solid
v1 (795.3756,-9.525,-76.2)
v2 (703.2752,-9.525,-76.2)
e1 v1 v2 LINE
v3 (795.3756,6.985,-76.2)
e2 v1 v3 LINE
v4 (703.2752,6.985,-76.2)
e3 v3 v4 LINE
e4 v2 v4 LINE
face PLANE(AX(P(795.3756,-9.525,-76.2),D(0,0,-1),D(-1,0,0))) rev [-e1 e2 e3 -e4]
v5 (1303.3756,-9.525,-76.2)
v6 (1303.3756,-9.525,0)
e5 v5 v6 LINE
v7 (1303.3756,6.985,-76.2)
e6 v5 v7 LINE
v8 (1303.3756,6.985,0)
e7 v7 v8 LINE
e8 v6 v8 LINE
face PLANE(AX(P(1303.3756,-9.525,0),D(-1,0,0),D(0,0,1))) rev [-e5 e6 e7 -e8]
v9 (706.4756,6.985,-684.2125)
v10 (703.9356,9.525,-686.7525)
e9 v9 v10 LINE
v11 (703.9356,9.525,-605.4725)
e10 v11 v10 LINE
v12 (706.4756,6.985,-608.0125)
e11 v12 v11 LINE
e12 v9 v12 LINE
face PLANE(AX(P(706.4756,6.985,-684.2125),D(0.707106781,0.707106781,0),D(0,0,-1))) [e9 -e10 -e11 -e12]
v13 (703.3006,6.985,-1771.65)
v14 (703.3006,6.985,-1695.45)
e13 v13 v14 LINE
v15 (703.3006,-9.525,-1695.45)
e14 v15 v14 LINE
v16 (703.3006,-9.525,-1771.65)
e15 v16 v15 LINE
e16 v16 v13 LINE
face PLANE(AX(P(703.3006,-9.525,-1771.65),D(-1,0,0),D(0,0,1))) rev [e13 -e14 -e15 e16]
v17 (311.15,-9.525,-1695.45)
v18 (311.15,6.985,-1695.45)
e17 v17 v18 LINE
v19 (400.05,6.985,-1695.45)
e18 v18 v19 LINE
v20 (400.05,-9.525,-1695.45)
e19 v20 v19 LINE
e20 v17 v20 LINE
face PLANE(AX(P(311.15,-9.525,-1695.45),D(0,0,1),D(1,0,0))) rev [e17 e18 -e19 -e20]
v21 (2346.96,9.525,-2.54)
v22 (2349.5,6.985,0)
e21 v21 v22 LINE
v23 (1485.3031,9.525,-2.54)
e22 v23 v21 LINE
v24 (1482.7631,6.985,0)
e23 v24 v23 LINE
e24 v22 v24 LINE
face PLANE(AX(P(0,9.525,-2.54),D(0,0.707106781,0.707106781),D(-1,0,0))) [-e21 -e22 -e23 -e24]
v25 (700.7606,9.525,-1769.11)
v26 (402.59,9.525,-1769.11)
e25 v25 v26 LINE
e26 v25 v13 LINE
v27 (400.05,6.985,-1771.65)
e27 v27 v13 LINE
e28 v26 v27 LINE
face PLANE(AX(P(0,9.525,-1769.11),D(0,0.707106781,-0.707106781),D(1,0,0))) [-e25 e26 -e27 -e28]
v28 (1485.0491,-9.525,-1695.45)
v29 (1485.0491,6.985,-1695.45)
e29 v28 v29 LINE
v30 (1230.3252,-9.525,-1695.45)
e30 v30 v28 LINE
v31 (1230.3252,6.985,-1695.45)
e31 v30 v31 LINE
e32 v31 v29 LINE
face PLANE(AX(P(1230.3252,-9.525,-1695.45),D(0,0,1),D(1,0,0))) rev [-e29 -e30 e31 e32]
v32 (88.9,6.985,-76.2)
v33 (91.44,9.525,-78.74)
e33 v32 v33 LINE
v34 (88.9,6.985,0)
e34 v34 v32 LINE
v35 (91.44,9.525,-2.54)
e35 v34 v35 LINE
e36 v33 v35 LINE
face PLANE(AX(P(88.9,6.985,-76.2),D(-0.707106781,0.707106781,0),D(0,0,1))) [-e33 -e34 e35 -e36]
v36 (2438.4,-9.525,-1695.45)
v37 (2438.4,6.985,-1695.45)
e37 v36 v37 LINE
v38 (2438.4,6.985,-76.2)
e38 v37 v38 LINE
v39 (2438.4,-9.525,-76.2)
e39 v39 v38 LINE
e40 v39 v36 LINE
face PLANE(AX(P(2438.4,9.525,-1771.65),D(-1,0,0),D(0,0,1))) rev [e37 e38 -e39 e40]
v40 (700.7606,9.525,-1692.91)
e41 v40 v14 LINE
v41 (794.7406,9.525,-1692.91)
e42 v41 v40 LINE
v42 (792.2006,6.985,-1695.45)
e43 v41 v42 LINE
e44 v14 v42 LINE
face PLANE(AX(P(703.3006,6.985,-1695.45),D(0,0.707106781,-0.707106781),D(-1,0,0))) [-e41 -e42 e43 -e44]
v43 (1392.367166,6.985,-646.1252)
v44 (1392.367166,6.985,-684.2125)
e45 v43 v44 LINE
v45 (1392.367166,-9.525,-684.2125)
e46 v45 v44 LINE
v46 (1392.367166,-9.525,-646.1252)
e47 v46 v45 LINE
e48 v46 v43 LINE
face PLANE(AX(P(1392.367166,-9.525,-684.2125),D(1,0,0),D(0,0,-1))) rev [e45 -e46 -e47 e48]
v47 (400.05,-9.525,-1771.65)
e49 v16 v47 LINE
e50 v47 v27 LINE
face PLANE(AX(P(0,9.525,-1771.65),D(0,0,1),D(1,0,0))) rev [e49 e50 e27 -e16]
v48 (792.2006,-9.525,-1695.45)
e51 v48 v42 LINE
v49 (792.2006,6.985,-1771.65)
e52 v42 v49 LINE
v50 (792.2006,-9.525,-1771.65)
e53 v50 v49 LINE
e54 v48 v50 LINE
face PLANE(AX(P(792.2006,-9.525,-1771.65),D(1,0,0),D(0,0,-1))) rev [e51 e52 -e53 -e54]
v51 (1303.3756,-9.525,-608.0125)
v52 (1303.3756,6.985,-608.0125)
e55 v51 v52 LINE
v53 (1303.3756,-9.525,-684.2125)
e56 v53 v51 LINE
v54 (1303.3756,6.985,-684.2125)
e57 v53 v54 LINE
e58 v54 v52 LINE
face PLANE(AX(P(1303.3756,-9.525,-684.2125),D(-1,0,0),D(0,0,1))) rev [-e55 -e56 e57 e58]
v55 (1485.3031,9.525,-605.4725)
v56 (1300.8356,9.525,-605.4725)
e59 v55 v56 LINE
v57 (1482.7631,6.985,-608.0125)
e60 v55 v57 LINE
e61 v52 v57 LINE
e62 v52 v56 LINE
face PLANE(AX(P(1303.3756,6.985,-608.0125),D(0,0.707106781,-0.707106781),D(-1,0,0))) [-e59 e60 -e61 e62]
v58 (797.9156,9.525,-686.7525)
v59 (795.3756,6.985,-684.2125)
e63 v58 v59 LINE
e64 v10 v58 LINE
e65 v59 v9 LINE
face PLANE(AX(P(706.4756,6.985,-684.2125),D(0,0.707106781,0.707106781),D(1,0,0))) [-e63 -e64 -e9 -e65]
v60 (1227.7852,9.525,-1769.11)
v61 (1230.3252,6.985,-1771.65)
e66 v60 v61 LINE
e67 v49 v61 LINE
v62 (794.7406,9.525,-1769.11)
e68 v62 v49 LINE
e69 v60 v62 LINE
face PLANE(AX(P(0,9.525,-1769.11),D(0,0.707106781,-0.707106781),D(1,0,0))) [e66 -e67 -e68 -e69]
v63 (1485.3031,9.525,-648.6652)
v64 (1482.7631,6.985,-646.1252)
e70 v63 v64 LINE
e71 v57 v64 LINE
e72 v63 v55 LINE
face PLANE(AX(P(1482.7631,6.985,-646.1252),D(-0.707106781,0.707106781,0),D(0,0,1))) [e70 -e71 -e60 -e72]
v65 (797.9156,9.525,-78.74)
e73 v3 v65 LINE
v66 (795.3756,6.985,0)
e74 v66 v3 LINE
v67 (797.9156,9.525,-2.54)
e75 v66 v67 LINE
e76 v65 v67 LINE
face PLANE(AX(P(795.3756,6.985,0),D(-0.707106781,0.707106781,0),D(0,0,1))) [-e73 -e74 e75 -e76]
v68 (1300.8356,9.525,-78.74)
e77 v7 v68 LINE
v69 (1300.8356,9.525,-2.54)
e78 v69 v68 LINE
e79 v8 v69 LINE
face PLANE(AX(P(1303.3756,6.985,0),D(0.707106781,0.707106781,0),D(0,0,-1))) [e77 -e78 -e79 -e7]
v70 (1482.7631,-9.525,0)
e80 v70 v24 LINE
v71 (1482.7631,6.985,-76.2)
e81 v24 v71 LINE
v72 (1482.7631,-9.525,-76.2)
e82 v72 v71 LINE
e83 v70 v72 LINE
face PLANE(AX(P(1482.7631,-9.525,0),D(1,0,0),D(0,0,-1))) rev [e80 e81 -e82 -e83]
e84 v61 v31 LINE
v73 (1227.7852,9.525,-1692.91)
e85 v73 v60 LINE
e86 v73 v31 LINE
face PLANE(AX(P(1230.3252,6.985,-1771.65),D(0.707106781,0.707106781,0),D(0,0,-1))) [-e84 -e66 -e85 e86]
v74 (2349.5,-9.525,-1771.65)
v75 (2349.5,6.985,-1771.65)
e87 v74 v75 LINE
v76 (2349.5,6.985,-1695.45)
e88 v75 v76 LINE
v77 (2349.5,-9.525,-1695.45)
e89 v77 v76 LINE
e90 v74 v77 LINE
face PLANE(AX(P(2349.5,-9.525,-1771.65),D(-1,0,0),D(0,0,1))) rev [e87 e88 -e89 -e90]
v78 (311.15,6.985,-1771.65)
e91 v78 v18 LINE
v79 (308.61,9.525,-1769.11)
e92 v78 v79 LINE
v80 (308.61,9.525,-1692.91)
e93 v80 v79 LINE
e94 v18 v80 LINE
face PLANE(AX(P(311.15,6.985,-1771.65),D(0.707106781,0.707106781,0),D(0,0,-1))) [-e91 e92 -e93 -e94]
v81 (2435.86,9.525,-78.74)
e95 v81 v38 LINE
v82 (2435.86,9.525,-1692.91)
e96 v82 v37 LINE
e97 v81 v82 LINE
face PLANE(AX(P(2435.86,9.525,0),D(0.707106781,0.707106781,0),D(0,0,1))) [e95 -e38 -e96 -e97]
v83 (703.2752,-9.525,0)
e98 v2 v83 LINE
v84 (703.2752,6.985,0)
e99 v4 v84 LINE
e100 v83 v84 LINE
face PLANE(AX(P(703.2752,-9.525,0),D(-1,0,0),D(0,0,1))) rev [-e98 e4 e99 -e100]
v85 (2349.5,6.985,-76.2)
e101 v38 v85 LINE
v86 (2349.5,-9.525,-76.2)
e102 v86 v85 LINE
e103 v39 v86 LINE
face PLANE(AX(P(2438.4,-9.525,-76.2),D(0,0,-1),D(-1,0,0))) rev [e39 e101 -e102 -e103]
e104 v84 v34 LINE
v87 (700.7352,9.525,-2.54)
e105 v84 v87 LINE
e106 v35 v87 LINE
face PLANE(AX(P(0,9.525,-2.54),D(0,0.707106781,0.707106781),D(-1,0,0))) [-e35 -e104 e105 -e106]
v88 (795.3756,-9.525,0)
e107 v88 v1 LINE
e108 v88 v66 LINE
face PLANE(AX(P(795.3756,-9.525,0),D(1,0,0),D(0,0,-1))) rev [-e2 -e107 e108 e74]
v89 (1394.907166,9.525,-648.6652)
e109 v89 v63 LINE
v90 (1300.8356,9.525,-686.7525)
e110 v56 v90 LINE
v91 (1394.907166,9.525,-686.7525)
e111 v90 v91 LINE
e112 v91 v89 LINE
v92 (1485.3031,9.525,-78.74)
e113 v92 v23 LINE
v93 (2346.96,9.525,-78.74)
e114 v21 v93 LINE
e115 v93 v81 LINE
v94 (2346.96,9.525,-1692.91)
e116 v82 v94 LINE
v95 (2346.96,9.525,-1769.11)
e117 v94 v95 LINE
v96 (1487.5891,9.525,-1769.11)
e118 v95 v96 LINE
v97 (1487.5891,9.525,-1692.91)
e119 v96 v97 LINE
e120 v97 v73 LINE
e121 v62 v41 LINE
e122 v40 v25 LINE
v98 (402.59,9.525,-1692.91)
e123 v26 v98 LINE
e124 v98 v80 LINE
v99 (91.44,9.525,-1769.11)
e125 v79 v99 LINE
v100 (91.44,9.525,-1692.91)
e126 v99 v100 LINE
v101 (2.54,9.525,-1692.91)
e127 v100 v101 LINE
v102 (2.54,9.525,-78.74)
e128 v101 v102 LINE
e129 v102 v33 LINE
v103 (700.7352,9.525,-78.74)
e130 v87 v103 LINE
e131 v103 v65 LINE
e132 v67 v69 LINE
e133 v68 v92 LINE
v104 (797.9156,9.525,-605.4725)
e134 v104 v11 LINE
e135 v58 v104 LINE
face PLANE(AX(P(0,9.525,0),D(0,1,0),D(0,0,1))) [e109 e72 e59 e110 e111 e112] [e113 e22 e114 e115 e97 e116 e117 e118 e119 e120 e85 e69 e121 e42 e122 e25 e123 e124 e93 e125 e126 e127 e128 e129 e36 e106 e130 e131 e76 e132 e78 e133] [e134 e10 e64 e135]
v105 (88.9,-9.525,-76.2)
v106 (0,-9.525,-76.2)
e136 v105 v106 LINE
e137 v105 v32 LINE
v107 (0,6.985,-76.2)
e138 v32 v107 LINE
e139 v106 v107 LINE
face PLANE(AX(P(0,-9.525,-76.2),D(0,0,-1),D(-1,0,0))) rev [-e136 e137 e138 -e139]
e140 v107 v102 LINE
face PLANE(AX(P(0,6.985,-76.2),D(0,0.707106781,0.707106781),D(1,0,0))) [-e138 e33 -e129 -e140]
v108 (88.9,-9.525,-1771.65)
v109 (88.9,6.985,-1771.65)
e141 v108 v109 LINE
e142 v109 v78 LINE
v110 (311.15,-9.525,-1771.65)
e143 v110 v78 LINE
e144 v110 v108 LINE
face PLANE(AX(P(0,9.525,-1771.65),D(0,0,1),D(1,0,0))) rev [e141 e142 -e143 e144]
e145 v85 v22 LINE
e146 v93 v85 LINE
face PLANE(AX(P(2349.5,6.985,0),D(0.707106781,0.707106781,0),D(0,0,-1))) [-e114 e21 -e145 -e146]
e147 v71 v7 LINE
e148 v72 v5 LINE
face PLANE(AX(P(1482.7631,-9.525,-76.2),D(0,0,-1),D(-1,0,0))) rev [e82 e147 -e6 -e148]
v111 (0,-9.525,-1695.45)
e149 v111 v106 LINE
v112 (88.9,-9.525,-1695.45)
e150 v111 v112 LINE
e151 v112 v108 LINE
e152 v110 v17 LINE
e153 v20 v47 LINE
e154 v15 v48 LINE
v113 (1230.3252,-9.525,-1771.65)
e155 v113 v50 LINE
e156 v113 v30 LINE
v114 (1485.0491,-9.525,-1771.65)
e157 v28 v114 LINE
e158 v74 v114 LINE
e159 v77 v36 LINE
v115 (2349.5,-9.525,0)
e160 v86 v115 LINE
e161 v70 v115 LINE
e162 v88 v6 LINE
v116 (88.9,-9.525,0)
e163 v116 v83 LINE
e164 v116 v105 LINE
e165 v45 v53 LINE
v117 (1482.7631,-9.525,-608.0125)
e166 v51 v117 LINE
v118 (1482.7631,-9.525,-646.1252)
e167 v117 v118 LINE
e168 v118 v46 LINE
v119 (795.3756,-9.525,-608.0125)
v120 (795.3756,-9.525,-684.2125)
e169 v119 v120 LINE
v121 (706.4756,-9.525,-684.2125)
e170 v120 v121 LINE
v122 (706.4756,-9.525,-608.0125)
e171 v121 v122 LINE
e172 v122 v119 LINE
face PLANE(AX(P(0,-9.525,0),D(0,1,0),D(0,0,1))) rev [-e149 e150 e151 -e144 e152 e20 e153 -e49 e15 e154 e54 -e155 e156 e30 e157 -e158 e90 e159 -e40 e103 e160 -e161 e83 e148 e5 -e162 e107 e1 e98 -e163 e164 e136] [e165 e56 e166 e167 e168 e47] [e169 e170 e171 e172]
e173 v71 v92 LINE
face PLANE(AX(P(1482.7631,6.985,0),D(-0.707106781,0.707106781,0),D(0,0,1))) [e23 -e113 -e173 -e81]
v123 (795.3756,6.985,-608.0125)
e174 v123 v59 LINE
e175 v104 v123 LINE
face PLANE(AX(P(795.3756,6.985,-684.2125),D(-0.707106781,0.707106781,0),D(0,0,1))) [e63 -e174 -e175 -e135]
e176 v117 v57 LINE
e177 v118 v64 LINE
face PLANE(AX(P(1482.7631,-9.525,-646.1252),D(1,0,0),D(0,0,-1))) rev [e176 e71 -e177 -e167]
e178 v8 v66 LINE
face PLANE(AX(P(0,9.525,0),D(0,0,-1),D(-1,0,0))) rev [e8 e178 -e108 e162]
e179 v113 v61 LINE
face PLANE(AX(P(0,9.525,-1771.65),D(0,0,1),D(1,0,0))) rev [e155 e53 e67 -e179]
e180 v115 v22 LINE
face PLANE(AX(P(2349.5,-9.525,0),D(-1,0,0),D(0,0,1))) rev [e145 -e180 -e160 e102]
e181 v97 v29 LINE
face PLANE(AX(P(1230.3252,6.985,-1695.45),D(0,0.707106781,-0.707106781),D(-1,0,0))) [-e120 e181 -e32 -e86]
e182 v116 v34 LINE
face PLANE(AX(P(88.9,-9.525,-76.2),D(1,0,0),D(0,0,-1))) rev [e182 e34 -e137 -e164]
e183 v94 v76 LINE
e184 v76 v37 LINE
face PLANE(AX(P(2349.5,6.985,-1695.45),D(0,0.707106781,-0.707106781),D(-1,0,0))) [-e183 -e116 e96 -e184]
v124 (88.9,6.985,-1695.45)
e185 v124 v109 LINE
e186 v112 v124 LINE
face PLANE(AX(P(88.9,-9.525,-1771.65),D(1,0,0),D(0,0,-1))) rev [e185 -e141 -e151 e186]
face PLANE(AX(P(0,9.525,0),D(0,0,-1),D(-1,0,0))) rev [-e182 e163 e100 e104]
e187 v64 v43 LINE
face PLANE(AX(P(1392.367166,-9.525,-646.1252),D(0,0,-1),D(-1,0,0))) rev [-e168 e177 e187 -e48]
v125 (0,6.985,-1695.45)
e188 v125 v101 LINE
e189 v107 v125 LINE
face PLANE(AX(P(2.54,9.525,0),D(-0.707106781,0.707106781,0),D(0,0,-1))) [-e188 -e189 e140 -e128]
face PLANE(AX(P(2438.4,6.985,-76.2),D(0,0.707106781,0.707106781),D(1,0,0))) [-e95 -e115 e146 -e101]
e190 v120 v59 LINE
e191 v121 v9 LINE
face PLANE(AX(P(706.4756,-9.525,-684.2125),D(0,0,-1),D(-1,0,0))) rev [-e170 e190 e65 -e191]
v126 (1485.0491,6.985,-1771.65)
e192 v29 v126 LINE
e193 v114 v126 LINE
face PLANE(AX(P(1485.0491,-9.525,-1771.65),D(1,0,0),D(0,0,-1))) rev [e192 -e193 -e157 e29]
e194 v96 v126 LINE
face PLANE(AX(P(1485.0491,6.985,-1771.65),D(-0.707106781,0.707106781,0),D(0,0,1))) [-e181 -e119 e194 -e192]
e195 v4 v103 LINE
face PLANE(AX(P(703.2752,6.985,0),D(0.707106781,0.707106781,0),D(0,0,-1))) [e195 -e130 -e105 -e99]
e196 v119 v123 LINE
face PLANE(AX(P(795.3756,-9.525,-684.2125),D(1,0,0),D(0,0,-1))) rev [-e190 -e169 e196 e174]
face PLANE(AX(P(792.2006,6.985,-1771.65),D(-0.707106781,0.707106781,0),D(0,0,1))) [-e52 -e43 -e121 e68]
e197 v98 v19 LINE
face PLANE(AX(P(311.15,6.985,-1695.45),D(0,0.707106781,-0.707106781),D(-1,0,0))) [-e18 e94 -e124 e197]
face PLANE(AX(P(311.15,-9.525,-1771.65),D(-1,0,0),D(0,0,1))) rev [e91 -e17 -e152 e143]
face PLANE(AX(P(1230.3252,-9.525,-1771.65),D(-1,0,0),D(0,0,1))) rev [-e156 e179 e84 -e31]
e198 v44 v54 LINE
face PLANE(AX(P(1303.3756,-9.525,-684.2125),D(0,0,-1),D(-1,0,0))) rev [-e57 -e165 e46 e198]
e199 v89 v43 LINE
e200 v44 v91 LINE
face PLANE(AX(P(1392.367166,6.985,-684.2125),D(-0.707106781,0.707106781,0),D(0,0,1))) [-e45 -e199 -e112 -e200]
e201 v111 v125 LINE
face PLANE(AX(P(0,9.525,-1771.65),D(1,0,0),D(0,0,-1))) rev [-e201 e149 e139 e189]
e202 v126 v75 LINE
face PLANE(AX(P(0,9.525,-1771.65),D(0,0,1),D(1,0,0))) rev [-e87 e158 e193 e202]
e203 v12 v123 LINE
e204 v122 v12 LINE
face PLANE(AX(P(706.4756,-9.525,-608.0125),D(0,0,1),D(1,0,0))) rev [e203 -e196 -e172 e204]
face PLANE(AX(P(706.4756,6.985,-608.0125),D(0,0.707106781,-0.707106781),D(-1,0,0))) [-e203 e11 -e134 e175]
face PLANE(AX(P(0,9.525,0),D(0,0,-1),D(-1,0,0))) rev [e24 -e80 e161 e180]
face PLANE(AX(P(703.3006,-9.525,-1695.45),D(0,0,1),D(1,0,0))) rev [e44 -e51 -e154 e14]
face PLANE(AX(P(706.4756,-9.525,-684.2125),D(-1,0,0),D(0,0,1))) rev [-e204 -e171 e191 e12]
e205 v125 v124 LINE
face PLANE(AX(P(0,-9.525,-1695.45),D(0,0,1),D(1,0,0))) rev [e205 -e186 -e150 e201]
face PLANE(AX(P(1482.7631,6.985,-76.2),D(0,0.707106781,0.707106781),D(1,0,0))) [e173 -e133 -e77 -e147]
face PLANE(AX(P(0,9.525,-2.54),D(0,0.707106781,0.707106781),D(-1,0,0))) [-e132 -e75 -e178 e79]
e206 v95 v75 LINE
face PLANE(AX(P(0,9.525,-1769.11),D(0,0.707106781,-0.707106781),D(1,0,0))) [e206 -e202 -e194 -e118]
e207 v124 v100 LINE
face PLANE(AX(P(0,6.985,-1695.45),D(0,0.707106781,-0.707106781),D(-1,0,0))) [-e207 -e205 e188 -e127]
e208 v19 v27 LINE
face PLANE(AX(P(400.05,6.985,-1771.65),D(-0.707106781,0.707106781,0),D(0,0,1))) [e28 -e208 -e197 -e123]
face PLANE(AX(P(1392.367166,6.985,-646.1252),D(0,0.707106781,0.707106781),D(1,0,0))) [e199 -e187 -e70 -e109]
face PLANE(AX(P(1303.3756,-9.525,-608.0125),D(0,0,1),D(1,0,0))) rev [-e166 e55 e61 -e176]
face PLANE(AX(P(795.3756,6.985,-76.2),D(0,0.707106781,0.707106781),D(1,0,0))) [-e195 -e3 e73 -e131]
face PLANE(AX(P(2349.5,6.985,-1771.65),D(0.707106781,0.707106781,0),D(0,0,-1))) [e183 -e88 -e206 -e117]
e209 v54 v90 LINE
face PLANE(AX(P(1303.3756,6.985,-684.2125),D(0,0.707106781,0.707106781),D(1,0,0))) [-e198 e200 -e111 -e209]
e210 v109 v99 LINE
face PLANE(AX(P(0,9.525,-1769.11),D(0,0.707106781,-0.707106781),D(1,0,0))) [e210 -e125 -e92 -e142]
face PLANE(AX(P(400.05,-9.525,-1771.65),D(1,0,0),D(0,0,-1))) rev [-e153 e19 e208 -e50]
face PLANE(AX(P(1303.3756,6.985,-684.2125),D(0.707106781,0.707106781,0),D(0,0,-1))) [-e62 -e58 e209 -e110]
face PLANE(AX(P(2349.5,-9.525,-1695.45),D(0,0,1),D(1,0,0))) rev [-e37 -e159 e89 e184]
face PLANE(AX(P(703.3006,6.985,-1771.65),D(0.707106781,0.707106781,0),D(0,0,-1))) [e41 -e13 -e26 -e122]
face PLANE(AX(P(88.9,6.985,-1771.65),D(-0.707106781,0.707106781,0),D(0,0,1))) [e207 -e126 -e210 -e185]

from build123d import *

# Parameters (mm, degrees)
SKETCH1_W                 = 2438.4
SKETCH1_H                 = 1771.65
BOSS_EXTRUDE1_DEPTH       = 9.525
CUT_EXTRUDE2_START        = 1303.3756
CUT_EXTRUDE2_OUTLINE_W    = 19.05
CUT_EXTRUDE2_OUTLINE_H    = 76.2
CUT_EXTRUDE2_OUTLINE_H_2  = 38.1127
CUT_EXTRUDE2_DEPTH        = 179.3875
CUT_EXTRUDE2_START_2      = 706.4756
CUT_EXTRUDE2_2_OUTLINE_W  = 19.05
CUT_EXTRUDE2_2_OUTLINE_H  = 76.2
CUT_EXTRUDE2_2_DEPTH      = 85.725
CUT_EXTRUDE2_3_OUTLINE_W  = 19.05
CUT_EXTRUDE2_3_OUTLINE_H  = 76.2
CUT_EXTRUDE2_3_DEPTH      = 88.9
CUT_EXTRUDE2_START_3      = 2349.5
CUT_EXTRUDE2_4_OUTLINE_W  = 19.05
CUT_EXTRUDE2_4_OUTLINE_H  = 76.2
CUT_EXTRUDE2_4_DEPTH      = 88.9
CUT_EXTRUDE2_START_4      = 311.15
CUT_EXTRUDE2_5_OUTLINE_W  = 19.05
CUT_EXTRUDE2_5_OUTLINE_H  = 76.2
CUT_EXTRUDE2_5_DEPTH      = 88.9
CUT_EXTRUDE2_START_5      = 1230.3252
CUT_EXTRUDE2_6_OUTLINE_W  = 19.05
CUT_EXTRUDE2_6_OUTLINE_H  = 76.2
CUT_EXTRUDE2_6_DEPTH      = 254.7239
CUT_EXTRUDE2_7_OUTLINE_W  = 19.05
CUT_EXTRUDE2_7_OUTLINE_H  = 38.0873
CUT_EXTRUDE2_7_DEPTH      = 88.991565563
CUT_EXTRUDE2_START_6      = 703.2752
CUT_EXTRUDE2_8_OUTLINE_W  = 19.05
CUT_EXTRUDE2_8_OUTLINE_H  = 76.2
CUT_EXTRUDE2_8_DEPTH      = 92.1004
CUT_EXTRUDE2_START_7      = 703.3006
CUT_EXTRUDE2_9_OUTLINE_W  = 19.05
CUT_EXTRUDE2_9_OUTLINE_H  = 76.2
CUT_EXTRUDE2_9_DEPTH      = 3.175
CUT_EXTRUDE2_START_8      = 792.2006
CUT_EXTRUDE2_10_OUTLINE_W = 19.05
CUT_EXTRUDE2_10_OUTLINE_H = 76.2
CUT_EXTRUDE2_10_DEPTH     = 3.175
CHAMFER1_SIZE             = 2.54


# Read off the part's stored shape, not the designer's step: Cut-Extrude2
with BuildPart() as part:
    # Sketch1 → Boss-Extrude1 (new, symmetric)
    with BuildSketch(Plane(origin=(0, 0, 0), x_dir=(1, 0, 0), z_dir=(0, 1, 0))):
        with Locations((1219.2, 885.825)):
            Rectangle(SKETCH1_W, SKETCH1_H)
    extrude(amount=BOSS_EXTRUDE1_DEPTH, both=True)

    # Cut-Extrude2 outline → Cut-Extrude2 (cut)
    with BuildSketch(Plane.YZ.offset(CUT_EXTRUDE2_START)):
        with Locations((0, -1733.55)):
            Rectangle(CUT_EXTRUDE2_OUTLINE_W, CUT_EXTRUDE2_OUTLINE_H)
        with Locations((0, -627.068849999)):
            Rectangle(CUT_EXTRUDE2_OUTLINE_W, CUT_EXTRUDE2_OUTLINE_H_2)
        with Locations((0, -38.1)):
            Rectangle(CUT_EXTRUDE2_OUTLINE_W, CUT_EXTRUDE2_OUTLINE_H)
    extrude(amount=CUT_EXTRUDE2_DEPTH, mode=Mode.SUBTRACT)

    # Cut-Extrude2 2 outline → Cut-Extrude2 2 (cut)
    with BuildSketch(Plane.YZ.offset(CUT_EXTRUDE2_START_2)):
        with Locations((0, -1733.55)):
            Rectangle(CUT_EXTRUDE2_2_OUTLINE_W, CUT_EXTRUDE2_2_OUTLINE_H)
        with Locations((0, -646.112499999)):
            Rectangle(CUT_EXTRUDE2_2_OUTLINE_W, CUT_EXTRUDE2_2_OUTLINE_H)
        with Locations((0, -38.1)):
            Rectangle(CUT_EXTRUDE2_2_OUTLINE_W, CUT_EXTRUDE2_2_OUTLINE_H)
    extrude(amount=CUT_EXTRUDE2_2_DEPTH, mode=Mode.SUBTRACT)

    # Cut-Extrude2 3 outline → Cut-Extrude2 3 (cut)
    with BuildSketch(Plane.YZ):
        with Locations((0, -1733.55)):
            Rectangle(CUT_EXTRUDE2_3_OUTLINE_W, CUT_EXTRUDE2_3_OUTLINE_H)
        with Locations((0, -38.1)):
            Rectangle(CUT_EXTRUDE2_3_OUTLINE_W, CUT_EXTRUDE2_3_OUTLINE_H)
    extrude(amount=CUT_EXTRUDE2_3_DEPTH, mode=Mode.SUBTRACT)

    # Cut-Extrude2 4 outline → Cut-Extrude2 4 (cut)
    with BuildSketch(Plane.YZ.offset(CUT_EXTRUDE2_START_3)):
        with Locations((0, -1733.55)):
            Rectangle(CUT_EXTRUDE2_4_OUTLINE_W, CUT_EXTRUDE2_4_OUTLINE_H)
        with Locations((0, -38.1)):
            Rectangle(CUT_EXTRUDE2_4_OUTLINE_W, CUT_EXTRUDE2_4_OUTLINE_H)
    extrude(amount=CUT_EXTRUDE2_4_DEPTH, mode=Mode.SUBTRACT)

    # Cut-Extrude2 5 outline → Cut-Extrude2 5 (cut)
    with BuildSketch(Plane.YZ.offset(CUT_EXTRUDE2_START_4)):
        with Locations((0, -1733.55)):
            Rectangle(CUT_EXTRUDE2_5_OUTLINE_W, CUT_EXTRUDE2_5_OUTLINE_H)
    extrude(amount=CUT_EXTRUDE2_5_DEPTH, mode=Mode.SUBTRACT)

    # Cut-Extrude2 6 outline → Cut-Extrude2 6 (cut)
    with BuildSketch(Plane.YZ.offset(CUT_EXTRUDE2_START_5)):
        with Locations((0, -1733.55)):
            Rectangle(CUT_EXTRUDE2_6_OUTLINE_W, CUT_EXTRUDE2_6_OUTLINE_H)
    extrude(amount=CUT_EXTRUDE2_6_DEPTH, mode=Mode.SUBTRACT)

    # Cut-Extrude2 7 outline → Cut-Extrude2 7 (cut)
    with BuildSketch(Plane.YZ.offset(CUT_EXTRUDE2_START)):
        with Locations((0, -665.168849999)):
            Rectangle(CUT_EXTRUDE2_7_OUTLINE_W, CUT_EXTRUDE2_7_OUTLINE_H)
    extrude(amount=CUT_EXTRUDE2_7_DEPTH, mode=Mode.SUBTRACT)

    # Cut-Extrude2 8 outline → Cut-Extrude2 8 (cut)
    with BuildSketch(Plane.YZ.offset(CUT_EXTRUDE2_START_6)):
        with Locations((0, -38.1)):
            Rectangle(CUT_EXTRUDE2_8_OUTLINE_W, CUT_EXTRUDE2_8_OUTLINE_H)
    extrude(amount=CUT_EXTRUDE2_8_DEPTH, mode=Mode.SUBTRACT)

    # Cut-Extrude2 9 outline → Cut-Extrude2 9 (cut)
    with BuildSketch(Plane.YZ.offset(CUT_EXTRUDE2_START_7)):
        with Locations((0, -1733.55)):
            Rectangle(CUT_EXTRUDE2_9_OUTLINE_W, CUT_EXTRUDE2_9_OUTLINE_H)
    extrude(amount=CUT_EXTRUDE2_9_DEPTH, mode=Mode.SUBTRACT)

    # Cut-Extrude2 10 outline → Cut-Extrude2 10 (cut)
    with BuildSketch(Plane.YZ.offset(CUT_EXTRUDE2_START_8)):
        with Locations((0, -646.112499999)):
            Rectangle(CUT_EXTRUDE2_10_OUTLINE_W, CUT_EXTRUDE2_10_OUTLINE_H)
    extrude(amount=CUT_EXTRUDE2_10_DEPTH, mode=Mode.SUBTRACT)

    # Chamfer1
    chamfer1_edges = [part.edges().sort_by_distance(p)[0] for p in [
        (1303.3756, 9.525, -646.112499999),
        (1393.06935, 9.525, -608.012499999),
        (1482.7631, 9.525, -627.068849999),
        (1437.565132782, 9.525, -646.125199999),
        (1392.367165563, 9.525, -665.168849999),
        (1347.871382781, 9.525, -684.212499999),
        (88.9, 9.525, -38.1),
        (44.45, 9.525, -76.2),
        (795.3756, 9.525, -38.1),
        (749.3254, 9.525, -76.2),
        (703.2752, 9.525, -38.1),
        (1482.7631, 9.525, -38.1),
        (1393.06935, 9.525, -76.2),
        (1303.3756, 9.525, -38.1),
        (2393.95, 9.525, -76.2),
        (2349.5, 9.525, -38.1),
        (44.45, 9.525, -1695.45),
        (88.9, 9.525, -1733.55),
        (0, 9.525, -885.825),
        (396.0876, 9.525, 0),
        (1049.3756, 9.525, 0),
        (1916.13155, 9.525, 0),
        (2438.4, 9.525, -885.825),
        (1917.27455, 9.525, -1771.65),
        (1011.2629, 9.525, -1771.65),
        (551.6753, 9.525, -1771.65),
        (200.025, 9.525, -1771.65),
        (311.15, 9.525, -1733.55),
        (355.6, 9.525, -1695.45),
        (400.05, 9.525, -1733.55),
        (703.3006, 9.525, -1733.55),
        (747.7506, 9.525, -1695.45),
        (792.2006, 9.525, -1733.55),
        (1230.3252, 9.525, -1733.55),
        (1357.68715, 9.525, -1695.45),
        (1485.0491, 9.525, -1733.55),
        (2349.5, 9.525, -1733.55),
        (2393.95, 9.525, -1695.45),
        (706.4756, 9.525, -646.112499999),
        (750.9256, 9.525, -608.012499999),
        (795.3756, 9.525, -646.112499999),
        (750.9256, 9.525, -684.212499999),
    ]]
    chamfer(chamfer1_edges, length=CHAMFER1_SIZE)


solid = part.part
